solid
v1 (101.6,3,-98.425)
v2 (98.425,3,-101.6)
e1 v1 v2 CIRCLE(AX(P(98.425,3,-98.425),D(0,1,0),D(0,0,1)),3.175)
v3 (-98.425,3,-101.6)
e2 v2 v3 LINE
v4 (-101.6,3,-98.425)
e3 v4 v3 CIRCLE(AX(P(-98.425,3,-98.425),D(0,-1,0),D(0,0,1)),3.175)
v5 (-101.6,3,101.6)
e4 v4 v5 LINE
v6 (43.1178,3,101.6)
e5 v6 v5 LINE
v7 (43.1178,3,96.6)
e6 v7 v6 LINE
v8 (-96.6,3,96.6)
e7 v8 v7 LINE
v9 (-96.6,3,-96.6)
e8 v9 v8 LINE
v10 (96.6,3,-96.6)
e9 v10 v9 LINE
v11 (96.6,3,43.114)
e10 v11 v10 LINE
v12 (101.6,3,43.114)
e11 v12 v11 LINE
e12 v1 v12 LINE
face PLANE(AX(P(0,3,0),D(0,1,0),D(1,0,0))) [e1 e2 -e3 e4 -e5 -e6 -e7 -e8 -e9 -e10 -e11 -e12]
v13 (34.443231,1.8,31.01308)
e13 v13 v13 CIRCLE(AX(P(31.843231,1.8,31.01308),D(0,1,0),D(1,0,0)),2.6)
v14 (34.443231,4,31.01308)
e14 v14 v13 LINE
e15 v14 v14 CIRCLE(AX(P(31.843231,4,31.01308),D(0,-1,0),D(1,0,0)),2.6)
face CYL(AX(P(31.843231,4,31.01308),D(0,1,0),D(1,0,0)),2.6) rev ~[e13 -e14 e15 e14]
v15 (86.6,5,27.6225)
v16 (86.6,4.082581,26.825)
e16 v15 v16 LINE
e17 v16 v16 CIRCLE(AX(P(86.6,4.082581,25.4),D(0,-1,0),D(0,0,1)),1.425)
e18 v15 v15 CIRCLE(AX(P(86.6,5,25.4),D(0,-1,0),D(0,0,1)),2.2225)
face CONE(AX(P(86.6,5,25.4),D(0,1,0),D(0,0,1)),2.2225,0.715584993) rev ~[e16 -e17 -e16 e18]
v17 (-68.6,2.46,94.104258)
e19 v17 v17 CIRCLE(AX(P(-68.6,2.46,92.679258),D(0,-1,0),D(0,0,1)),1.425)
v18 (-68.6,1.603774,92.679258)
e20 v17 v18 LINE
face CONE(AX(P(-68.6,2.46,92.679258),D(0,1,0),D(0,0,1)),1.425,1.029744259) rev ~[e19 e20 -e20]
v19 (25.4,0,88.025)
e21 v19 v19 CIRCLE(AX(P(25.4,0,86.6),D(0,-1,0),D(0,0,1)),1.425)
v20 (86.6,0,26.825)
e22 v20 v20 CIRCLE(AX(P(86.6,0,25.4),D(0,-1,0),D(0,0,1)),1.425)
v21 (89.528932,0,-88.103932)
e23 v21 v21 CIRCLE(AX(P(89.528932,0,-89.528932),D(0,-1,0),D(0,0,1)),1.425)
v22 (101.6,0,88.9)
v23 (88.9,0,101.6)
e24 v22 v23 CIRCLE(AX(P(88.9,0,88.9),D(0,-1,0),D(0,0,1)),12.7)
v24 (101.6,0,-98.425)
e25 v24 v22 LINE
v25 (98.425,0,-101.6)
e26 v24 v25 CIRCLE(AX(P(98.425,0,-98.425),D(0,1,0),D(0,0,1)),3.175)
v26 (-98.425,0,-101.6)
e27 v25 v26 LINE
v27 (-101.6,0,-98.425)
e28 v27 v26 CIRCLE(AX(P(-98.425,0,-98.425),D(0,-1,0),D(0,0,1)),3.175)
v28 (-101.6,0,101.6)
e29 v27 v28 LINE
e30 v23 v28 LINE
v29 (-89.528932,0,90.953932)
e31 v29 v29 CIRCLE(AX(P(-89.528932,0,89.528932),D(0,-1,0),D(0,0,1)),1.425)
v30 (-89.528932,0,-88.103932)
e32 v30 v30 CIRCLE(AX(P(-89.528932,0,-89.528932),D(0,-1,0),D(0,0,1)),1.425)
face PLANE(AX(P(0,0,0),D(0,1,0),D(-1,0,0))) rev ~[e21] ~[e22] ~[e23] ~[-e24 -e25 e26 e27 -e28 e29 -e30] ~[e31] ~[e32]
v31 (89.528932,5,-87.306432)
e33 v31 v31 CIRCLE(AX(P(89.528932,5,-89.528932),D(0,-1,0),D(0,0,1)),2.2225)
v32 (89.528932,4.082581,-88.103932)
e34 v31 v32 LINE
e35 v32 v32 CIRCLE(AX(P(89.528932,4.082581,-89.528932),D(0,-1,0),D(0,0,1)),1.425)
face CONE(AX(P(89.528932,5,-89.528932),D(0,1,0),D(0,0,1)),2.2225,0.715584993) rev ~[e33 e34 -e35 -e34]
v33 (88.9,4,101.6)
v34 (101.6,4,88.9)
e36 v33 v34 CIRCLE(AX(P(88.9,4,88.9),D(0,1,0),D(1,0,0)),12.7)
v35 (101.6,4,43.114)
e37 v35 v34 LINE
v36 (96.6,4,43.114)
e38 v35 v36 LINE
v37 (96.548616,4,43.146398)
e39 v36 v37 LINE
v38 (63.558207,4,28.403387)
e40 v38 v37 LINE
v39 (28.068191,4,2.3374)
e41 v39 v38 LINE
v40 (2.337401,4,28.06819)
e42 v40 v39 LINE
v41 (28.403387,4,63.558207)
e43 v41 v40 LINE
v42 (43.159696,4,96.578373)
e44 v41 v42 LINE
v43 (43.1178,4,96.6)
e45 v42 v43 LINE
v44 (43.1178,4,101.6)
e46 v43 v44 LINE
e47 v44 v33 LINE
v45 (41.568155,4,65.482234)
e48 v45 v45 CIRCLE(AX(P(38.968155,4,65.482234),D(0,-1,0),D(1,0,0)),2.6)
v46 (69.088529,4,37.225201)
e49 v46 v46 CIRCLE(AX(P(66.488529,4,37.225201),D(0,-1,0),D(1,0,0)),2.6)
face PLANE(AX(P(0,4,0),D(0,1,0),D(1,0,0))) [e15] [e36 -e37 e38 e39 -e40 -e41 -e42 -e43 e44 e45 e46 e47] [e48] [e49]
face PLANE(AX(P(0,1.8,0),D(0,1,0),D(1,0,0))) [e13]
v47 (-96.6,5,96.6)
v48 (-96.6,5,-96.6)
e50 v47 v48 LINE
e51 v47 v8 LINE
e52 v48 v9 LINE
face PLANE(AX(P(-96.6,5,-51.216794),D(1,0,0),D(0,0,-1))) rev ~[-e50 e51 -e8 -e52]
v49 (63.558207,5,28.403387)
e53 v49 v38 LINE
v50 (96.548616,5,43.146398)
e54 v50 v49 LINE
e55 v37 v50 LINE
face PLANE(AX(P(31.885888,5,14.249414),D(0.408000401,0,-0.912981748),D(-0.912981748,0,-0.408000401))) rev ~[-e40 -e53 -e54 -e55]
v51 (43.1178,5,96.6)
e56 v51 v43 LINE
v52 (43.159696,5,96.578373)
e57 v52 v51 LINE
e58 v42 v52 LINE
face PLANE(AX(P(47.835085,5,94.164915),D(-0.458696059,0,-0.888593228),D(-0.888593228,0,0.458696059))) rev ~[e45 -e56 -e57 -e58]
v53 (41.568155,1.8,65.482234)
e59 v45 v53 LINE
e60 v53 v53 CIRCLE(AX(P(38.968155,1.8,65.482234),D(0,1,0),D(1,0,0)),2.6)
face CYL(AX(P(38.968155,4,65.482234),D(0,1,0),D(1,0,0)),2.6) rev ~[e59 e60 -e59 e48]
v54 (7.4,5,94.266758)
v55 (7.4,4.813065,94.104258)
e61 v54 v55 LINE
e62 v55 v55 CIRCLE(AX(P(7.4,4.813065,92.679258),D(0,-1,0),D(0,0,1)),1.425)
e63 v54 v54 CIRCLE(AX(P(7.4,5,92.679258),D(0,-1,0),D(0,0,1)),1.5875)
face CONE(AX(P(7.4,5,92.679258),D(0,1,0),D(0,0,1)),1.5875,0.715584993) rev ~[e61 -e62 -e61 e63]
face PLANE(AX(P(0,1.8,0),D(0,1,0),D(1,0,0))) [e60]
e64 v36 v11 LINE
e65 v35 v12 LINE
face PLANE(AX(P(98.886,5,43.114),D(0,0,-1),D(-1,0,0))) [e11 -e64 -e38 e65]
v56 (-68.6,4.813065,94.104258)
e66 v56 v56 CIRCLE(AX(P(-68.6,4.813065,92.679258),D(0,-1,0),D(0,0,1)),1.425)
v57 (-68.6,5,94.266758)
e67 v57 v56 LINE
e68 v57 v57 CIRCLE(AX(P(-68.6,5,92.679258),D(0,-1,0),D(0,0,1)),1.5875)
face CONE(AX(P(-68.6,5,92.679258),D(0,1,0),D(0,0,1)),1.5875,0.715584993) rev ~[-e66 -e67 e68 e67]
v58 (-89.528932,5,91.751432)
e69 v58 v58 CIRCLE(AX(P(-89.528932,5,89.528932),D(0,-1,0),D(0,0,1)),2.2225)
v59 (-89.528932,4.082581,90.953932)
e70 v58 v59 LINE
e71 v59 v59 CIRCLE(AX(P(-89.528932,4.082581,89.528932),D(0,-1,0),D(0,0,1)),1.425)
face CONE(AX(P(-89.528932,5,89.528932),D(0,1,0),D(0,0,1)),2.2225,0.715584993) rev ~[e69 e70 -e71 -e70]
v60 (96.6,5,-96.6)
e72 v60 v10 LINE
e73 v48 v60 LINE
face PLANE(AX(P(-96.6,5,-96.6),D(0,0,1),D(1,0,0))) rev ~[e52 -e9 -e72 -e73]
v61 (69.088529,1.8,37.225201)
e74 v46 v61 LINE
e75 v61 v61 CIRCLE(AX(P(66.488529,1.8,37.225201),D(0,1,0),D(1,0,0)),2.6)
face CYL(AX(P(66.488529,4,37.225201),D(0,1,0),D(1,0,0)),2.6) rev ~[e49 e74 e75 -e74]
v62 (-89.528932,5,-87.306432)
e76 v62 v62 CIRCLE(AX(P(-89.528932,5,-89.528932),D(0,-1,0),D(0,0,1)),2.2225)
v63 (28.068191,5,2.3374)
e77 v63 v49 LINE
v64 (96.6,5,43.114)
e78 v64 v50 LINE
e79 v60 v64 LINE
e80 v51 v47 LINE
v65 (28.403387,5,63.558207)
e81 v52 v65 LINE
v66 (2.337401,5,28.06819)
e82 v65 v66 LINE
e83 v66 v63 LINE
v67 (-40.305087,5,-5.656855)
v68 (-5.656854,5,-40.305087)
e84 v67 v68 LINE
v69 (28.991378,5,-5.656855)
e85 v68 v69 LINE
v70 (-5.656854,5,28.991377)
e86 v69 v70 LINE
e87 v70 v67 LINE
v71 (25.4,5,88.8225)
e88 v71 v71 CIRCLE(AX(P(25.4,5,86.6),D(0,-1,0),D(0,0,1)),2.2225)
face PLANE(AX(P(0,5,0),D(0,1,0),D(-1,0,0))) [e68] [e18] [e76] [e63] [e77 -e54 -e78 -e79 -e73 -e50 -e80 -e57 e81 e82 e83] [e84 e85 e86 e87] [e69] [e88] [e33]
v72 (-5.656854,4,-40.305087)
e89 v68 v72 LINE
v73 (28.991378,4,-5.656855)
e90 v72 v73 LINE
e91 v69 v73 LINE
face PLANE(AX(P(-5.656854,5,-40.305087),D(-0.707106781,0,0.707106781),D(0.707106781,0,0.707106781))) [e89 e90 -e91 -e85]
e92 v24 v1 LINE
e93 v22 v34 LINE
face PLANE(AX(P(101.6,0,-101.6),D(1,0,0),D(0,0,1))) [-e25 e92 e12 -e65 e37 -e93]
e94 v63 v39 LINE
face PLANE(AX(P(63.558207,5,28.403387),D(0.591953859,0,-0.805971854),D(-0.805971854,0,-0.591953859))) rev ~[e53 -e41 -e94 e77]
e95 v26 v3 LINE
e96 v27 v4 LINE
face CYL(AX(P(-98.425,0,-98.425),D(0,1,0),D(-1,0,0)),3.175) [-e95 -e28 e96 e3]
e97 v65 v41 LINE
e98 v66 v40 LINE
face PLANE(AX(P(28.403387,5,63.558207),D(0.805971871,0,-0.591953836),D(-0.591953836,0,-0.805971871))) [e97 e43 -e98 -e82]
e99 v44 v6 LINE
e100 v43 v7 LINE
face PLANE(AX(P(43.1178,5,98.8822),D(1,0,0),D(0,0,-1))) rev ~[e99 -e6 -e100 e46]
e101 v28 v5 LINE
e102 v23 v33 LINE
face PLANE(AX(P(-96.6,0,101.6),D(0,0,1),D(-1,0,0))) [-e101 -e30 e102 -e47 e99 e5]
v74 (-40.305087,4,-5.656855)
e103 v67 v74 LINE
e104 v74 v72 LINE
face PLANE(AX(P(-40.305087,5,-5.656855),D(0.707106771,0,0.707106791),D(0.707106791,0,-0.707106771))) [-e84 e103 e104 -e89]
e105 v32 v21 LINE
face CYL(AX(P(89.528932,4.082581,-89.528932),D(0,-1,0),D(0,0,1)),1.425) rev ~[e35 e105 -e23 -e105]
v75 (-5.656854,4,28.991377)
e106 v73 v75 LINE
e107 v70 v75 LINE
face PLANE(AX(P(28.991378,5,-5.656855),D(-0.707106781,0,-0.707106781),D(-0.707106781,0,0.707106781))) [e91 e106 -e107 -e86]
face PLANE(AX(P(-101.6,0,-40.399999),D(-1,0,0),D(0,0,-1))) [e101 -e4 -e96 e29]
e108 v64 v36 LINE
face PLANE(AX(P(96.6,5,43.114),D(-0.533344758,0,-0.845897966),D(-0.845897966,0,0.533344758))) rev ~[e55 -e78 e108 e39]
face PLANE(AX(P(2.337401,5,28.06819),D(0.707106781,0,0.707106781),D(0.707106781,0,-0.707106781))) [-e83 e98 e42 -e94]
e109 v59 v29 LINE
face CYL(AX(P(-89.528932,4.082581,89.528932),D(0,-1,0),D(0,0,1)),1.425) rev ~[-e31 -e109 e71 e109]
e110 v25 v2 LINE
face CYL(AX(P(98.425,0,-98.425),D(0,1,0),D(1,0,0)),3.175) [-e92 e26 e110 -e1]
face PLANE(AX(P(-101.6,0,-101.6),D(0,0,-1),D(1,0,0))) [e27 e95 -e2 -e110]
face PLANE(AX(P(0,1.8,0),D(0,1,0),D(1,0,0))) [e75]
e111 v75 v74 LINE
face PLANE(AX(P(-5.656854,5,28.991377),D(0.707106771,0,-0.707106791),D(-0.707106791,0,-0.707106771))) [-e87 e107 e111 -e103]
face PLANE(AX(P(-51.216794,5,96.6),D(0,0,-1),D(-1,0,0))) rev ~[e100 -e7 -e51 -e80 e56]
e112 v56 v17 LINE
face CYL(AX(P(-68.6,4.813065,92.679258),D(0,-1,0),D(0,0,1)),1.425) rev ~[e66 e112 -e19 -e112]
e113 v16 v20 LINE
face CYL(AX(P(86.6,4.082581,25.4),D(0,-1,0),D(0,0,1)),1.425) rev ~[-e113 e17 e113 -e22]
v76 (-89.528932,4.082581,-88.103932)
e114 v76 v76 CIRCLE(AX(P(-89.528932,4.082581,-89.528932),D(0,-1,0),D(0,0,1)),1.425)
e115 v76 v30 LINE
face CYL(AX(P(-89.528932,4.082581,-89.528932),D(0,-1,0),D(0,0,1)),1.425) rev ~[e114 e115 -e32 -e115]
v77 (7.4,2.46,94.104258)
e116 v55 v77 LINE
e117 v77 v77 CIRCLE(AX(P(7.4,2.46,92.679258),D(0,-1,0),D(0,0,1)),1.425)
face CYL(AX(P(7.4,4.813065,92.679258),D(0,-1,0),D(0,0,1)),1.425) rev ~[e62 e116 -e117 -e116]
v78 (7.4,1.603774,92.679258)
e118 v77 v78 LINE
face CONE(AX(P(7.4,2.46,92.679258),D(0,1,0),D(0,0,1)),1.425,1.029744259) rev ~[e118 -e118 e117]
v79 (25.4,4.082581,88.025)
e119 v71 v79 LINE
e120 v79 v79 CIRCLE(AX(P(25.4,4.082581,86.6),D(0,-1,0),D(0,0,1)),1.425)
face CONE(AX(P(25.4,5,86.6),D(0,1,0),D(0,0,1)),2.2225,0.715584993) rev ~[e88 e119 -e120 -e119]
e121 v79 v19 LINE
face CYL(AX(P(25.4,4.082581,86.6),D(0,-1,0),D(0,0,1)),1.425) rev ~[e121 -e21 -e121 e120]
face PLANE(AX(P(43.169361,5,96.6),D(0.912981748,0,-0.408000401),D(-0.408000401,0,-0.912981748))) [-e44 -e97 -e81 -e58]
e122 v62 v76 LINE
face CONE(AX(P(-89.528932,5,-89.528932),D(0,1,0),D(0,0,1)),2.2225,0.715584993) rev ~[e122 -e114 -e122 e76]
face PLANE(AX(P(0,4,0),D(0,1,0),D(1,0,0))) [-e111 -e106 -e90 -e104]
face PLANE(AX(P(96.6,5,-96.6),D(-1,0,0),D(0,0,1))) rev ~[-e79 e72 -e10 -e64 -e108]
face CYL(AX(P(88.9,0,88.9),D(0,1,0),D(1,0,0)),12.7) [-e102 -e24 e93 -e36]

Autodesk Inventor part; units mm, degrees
ref_plane "YZ Plane" through (0, 0, 0) normal (1, 0, 0) x (0, 1, 0)
ref_plane "XZ Plane" through (0, 0, 0) normal (0, 1, 0) x (-1, 0, 0)
sketch "Sketch1" plane through (0, 0, 0) normal (0, 1, 0) x (-1, 0, 0)
  line L0 (101.6, -101.6) -> (-101.6, -101.6)
  line L1 (-101.6, -101.6) -> (-101.6, 101.6)
  line L2 (-101.6, 101.6) -> (101.6, 101.6)
  line L3 (101.6, 101.6) -> (101.6, -101.6)
  line L4 (96.6, -96.6) -> (-96.6, -96.6)
  line L5 (-96.6, -96.6) -> (-96.6, 96.6)
  line L6 (-96.6, 96.6) -> (96.6, 96.6)
  line L7 (96.6, 96.6) -> (96.6, -96.6)
  line L8 (101.6, 101.6) -> (-40.4, 101.6)
  circle A0 centre (0, 0) radius 88.9
  circle A1 centre (0, 0) radius 109.337642
  line L9 (-40.4, 101.6) -> (-101.6, 40.4)
  line L10 (-45.4, 101.6) -> (-101.6, 45.4)
  line L11 (96.6, 96.6) -> (96.6, 101.6)
  line L12 (-45.4, 101.6) -> (-35.4, 101.6)
  line L13 (-35.4, 101.6) -> (-35.4, 96.6)
  line L14 (-35.4, 96.6) -> (-45.4, 96.6)
  line L15 (-45.4, 96.6) -> (-45.4, 101.6)
  line L16 (-45.4, 101.6) -> (-43.114, 101.6)
  line L17 (-43.114, 101.6) -> (-43.114, 96.6)
  line L18 (-43.114, 96.6) -> (-45.4, 96.6)
  line L19 (-45.4, 96.6) -> (-45.4, 101.6)
  line L20 (-96.6, 45.4) -> (-101.6, 45.4)
  line L21 (-101.6, 45.4) -> (-101.6, 43.114)
  line L22 (-101.6, 43.114) -> (-96.6, 43.114)
  line L23 (-96.6, 43.114) -> (-96.6, 45.4)
  point P0 (96.6, 51.216794)
  point P1 (101.6, 40.4)
  point P2 (101.6, -40.4)
  point P3 (96.6, -51.216794)
  point P4 (-96.6, 45.4)
  point P5 (-45.4, 96.6)
  dimension "d0" = 203.2
  dimension "d1" = 203.2
  dimension "d2" = 101.6
  dimension "d3" = 101.6
  dimension "d4" = 5
  dimension "d5" = 5
  dimension "d6" = 5
  dimension "d7" = 5
  dimension "d10" = 142
  dimension "d12" = 61.2
  dimension "d14" = 177.8
  dimension "d15" = 5
  dimension "d16" = 5
  dimension "d17" = 10
  dimension "d86" = 2.286
  dimension "d87" = 2.286
extrude "Extrusion1" add sketch "Sketch1" along normal blind 5 contours L0 A1 L4 L7 L3 | L0 A1 L4 | A1 L7 L3 | L0 L1 A1 L5 L4 | A1 L7 L4 | L4 A1 L5 L9 L6 L7 | A1 L7 L11 L2 L3 | L4 L5 A1 | A1 L6 L7 | L1 L9 L22 L5 A1 | L11 L6 A1 L2 | L6 L13 L2 A1 | L1 L22 A1 | A1 L22 L9 | L22 L9 L5 | L6 L17 L9 L2 L13 | L1 L20 A1 L22 | A1 L20 L9 L22 | L20 A1 L10 L5 | L5 L10 L6 L9 | A1 L17 L2 | L9 L17 A1 | L6 L9 L17 | L1 L2 L10 A1 L6 L5 | L10 A1 L20 | L10 A1 L5 | L5 A1 L6 L10 | L15 A1 L17 L9 | L6 L10 A1 L15 | L17 A1 L15 L2 | L5 L6 A1 | L6 A1 L10 | A1 L10 L15 | A0
sketch "Sketch3" plane through (0, 5, 0) normal (0, 1, 0) x (1, 0, 0)
  circle A0 centre (0, 0) radius 88.9
  line L0 (-101.6, 101.6) -> (-101.6, -101.6)
  line L1 (-101.6, -101.6) -> (101.6, -101.6)
  line L2 (-101.6, 101.6) -> (101.6, 101.6)
  line L3 (101.6, 101.6) -> (101.6, -101.6)
  line L4 (101.6, -101.6) -> (-101.6, -101.6)
  line L5 (-101.6, -101.6) -> (-101.6, 101.6)
  line L6 (-96.6, 96.6) -> (96.6, 96.6)
  line L7 (96.6, 96.6) -> (96.6, -96.6)
  line L8 (96.6, -96.6) -> (-96.6, -96.6)
  line L9 (-96.6, -96.6) -> (-96.6, 96.6)
  line L10 (-101.6, -101.6) -> (40.4, -101.6)
  circle A1 centre (0, 0) radius 109.337642
  line L11 (40.4, -101.6) -> (101.6, -40.4)
  line L12 (101.6, -101.6) -> (101.6, 101.6)
  line L13 (45.4038, -101.6) -> (101.6, -45.4038)
  line L14 (96.6, -45.4) -> (101.6, -45.4038)
  line L15 (45.4, -96.6) -> (45.4038, -101.6)
  line L16 (96.6, -45.4) -> (101.6, -45.4)
  line L17 (101.6, -45.4) -> (101.6, -43.114)
  line L18 (101.6, -43.114) -> (96.6, -43.114)
  line L19 (96.6, -43.114) -> (96.6, -45.4)
  line L20 (45.4038, -101.6) -> (43.1178, -101.6)
  line L21 (43.1178, -101.6) -> (43.1178, -96.6)
  line L22 (43.1178, -96.6) -> (45.4038, -96.6)
  line L23 (45.4038, -96.6) -> (45.4038, -101.6)
  point P0 (45.4038, -101.6)
  point P1 (50.4038, -96.6)
  point P2 (96.6, -50.4038)
  dimension "d28" = 177.8
  dimension "d29" = 5
  dimension "d30" = 5
  dimension "d31" = 5
  dimension "d32" = 5
  dimension "d33" = 142
  dimension "d76" = 5.0038
  dimension "d77" = 5.0038
  dimension "d88" = 2.286
  dimension "d89" = 2.286
extrude "Extrusion3" cut sketch "Sketch3" against normal blind 2 contours L2 A1 L6 L9 L0 | A1 L9 L0 | L2 A1 L6 | A1 L9 L8 L1 L0 | L2 L3 A1 L7 L6 | A1 L8 L21 L11 L1 | L3 L11 L18 L7 A1 | A1 L21 L1 | L11 L21 A1 | L3 L18 A1 | A1 L18 L11
sketch "Sketch4" plane through (0, 5, 0) normal (0, 1, 0) x (1, 0, 0)
  line L0 (101.6, 101.6) -> (-101.6, 101.6)
  line L1 (-101.6, 101.6) -> (-101.6, -101.6)
  line L2 (-101.6, -101.6) -> (101.6, -101.6)
  line L3 (101.6, -101.6) -> (101.6, 101.6)
  circle A0 centre (0, 0) radius 2.5
  line L4 (11.331386, 2.138998) -> (-2.138998, -11.331386)
  line L5 (0, 0) -> (-5.656854, 5.656854)
  line L6 (-5.656854, -14.849242) -> (-26.162951, 5.656855)
  line L7 (-5.656854, 26.162952) -> (14.849242, 5.656855)
  circle A1 centre (-5.656854, 5.656854) radius 14
  line L8 (-26.162951, 5.656855) -> (-5.656854, 26.162952)
  line L9 (14.849242, 5.656855) -> (-5.656854, -14.849242)
  line L10 (-40.305087, 5.656855) -> (-5.656854, 40.305087)
  line L11 (-5.656854, 40.305087) -> (28.991378, 5.656855)
  line L12 (28.991378, 5.656855) -> (-5.656854, -28.991377)
  line L13 (-5.656854, -28.991377) -> (-40.305087, 5.656855)
  line L14 (-22.645095, 9.174711) -> (-9.174711, 22.645095)
  line L15 (-9.174711, 22.645095) -> (-12.766813, 26.237197)
  line L16 (-12.766813, 26.237197) -> (-26.237197, 12.766813)
  line L17 (-26.237197, 12.766813) -> (-22.645095, 9.174711)
  point P0 (9.525, 22.5)
  point P1 (-9.525, -6.5)
  dimension "d37" = 203.2
  dimension "d38" = 203.2
  dimension "d39" = 8
  dimension "d40" = 28
  dimension "d41" = 29
  dimension "d42" = 29
  dimension "d43" = 14.5
  dimension "d44" = 10
  dimension "d45" = 10
  dimension "d46" = 10
  dimension "d47" = 10
  dimension "d48" = 5.08
  dimension "d49" = 9.525
  dimension "d50" = 9.525
  dimension "d55" = 101.6
  dimension "d56" = 101.6
extrude "Extrusion4" cut sketch "Sketch4" against normal blind 1 contours A0 | L4 L9 L6 L8 L7 | L8 L17 L16 L15 | A1 | L10 L11 L12 L13
sketch "Sketch6" plane through (0, 5, 0) normal (0, 1, 0) x (1, 0, 0)
  line L0 (45.4038, -101.6) -> (0, 0)
  line L1 (50.4038, -96.6) -> (45.4038, -101.6)
  line L2 (96.6, -43.114) -> (96.6, 96.6)
  line L3 (101.6, -101.6) -> (101.6, 101.6)
  circle A0 centre (0, 0) radius 34.925
  circle A1 centre (0, 0) radius 33.425
  line L4 (-101.6, 101.6) -> (-101.6, -101.6)
  line L5 (-101.6, -101.6) -> (40.4, -101.6)
  line L6 (-101.6, -101.6) -> (101.6, -101.6)
  line L7 (101.6, 101.6) -> (101.6, -43.114)
  line L8 (101.6, -45.4038) -> (0, 0)
  line L9 (-96.6, -96.6) -> (43.1178, -96.6)
  line L10 (96.6, -43.114) -> (96.6, 96.6)
  line L11 (43.1178, -101.6) -> (-101.6, -101.6)
  line L12 (101.6, -45.4038) -> (96.6, -50.4038)
  line L13 (45.4038, -101.6) -> (101.6, -45.4038)
  line L14 (43.1178, -101.6) -> (101.6, -101.6)
  line L15 (0, 0) -> (101.6, -50.4076)
  line L16 (50.4076, -101.6) -> (0, 0)
  line L17 (43.169361, -96.6) -> (47.926911, -96.6)
  line L18 (96.6, -43.169361) -> (96.6, -47.926911)
  line L19 (40.4, -101.6) -> (101.6, -40.4)
  point P0 (13.637413, -30.516415)
  point P1 (30.516415, -13.637413)
  point P2 (14.249414, -31.885888)
  point P3 (31.286053, -15.522194)
  point P4 (29.942343, -14.855528)
  point P5 (31.885888, -14.249414)
  point P6 (98.255522, -48.748278)
  point P7 (96.6, -47.926911)
  point P8 (47.926911, -96.6)
  point P9 (15.522194, -31.286053)
  point P10 (96.6, -45.4)
  point P11 (45.4, -96.6)
  point P12 (14.855528, -29.942343)
  point P13 (96.6, -45.4)
  point P14 (45.4, -96.6)
  point P15 (45.4, -96.6)
  point P16 (47.088956, -94.911044)
  point P17 (94.911044, -47.088956)
  point P18 (96.6, -45.4)
  point P19 (43.858319, -98.141681)
  point P20 (98.141681, -43.858319)
  point P21 (45.4, -96.6)
  point P22 (96.6, -45.4)
  dimension "d71" = 69.85
  dimension "d72" = 66.85
  dimension "d75" = 142
  dimension "d78" = 5.0038
  dimension "d82" = 5.0038
extrude "Extrusion6" cut sketch "Sketch6" against normal blind 1 contours L0 A0 L16 L19 L17 | L0 A1 L16 A0 | L16 A1 L15 A0 | L15 A0 L8 L18 L19 | A0 L15 A1 L8
fillet "Fillet3" radius 12.7 1 edges at (101.6, 2.5, 101.6)
sketch "Sketch9" plane through (0, 4, 0) normal (0, 1, 0) x (1, 0, 0)
  point P0 (0, 0)
sketch "Sketch10" plane through (0, 5, 0) normal (0, 1, 0) x (1, 0, 0)
  point P0 (0, 0)
ref_plane "Work Plane1" through (24.695704, 5, 24.695704) normal (0.7071068, 0, 0.7071068) x (0.7071068, 0, -0.7071068)
sketch "Sketch15" plane through (0, 5, 0) normal (0, 1, 0) x (1, 0, 0)
  line L0 (43.169361, -96.6) -> (13.637413, -30.516415)
  line L1 (28.403387, -63.558207) -> (-0.656854, -23.991377)
  line L2 (28.991378, 5.656855) -> (-5.656854, -28.991377)
  line L3 (30.516415, -13.637413) -> (96.6, -43.169361)
  line L4 (-5.656854, 40.305087) -> (28.991378, 5.656855)
  line L5 (63.558207, -28.403387) -> (23.991378, 0.656855)
  line L6 (2.337401, -28.06819) -> (28.068191, -2.3374)
  arc A0 (13.637413, -30.516415) -> (30.516415, -13.637413) centre (0, 0) ccw
  line L7 (28.403387, -63.558207) -> (13.637413, -30.516415)
  line L8 (63.558207, -28.403387) -> (30.516415, -13.637413)
  arc A1 (13.637413, -30.516415) -> (30.516415, -13.637413) centre (0, 0) ccw
  line L9 (28.619467, -64.395349) -> (1.630294, -28.775297)
  line L10 (1.630294, -28.775297) -> (2.337401, -28.06819)
  dimension "d138" = 5
  dimension "d139" = 5
  dimension "d140" = 5
  dimension "d168" = 1
extrude "Extrusion11" cut sketch "Sketch15" against normal blind 1 contours L1 L6 L5 L3 A0 L0
sketch "Sketch16" plane through (0, 4, 0) normal (0, 1, 0) x (1, 0, 0)
  line L0 (2.337401, -28.06819) -> (28.068191, -2.3374)
  line L1 (9.408468, -20.997123) -> (12.944002, -24.532656)
  line L2 (12.944002, -24.532656) -> (24.532657, -12.944002)
  line L3 (24.532657, -12.944002) -> (20.997123, -9.408468)
  line L4 (12.944002, -24.532656) -> (24.532657, -12.944002)
  line L5 (24.532657, -12.944002) -> (28.559218, -16.970562)
  line L6 (28.559218, -16.970562) -> (16.970563, -28.559217)
  line L7 (16.970563, -28.559217) -> (12.944002, -24.532656)
  line L8 (12.944002, -24.532656) -> (5.331655, -32.145003)
  line L9 (28.403387, -63.558207) -> (2.337401, -28.06819)
  line L10 (24.532657, -12.944002) -> (32.145004, -5.331655)
  line L11 (28.068191, -2.3374) -> (63.558207, -28.403387)
  point P0 (0, 0)
  dimension "d144" = 10
  dimension "d145" = 10
  dimension "d146" = 5
  dimension "d152" = 0
  dimension "d153" = 0
extrude "Extrusion12" cut sketch "Sketch16" along normal up to surface (1 mm away)
sketch "Sketch20" plane through (0, 5, 0) normal (0, 1, 0) x (1, 0, 0)
  line L0 (47.088956, -94.911044) -> (45.4, -96.6)
  line L1 (47.088956, -94.911044) -> (94.937604, -47.062396)
  line L2 (94.164915, -47.835085) -> (33.507042, -17.740422)
  line L3 (94.911044, -47.088956) -> (31.286053, -15.522194)
  line L4 (15.522194, -31.286053) -> (47.088956, -94.911044)
  line L5 (17.526471, -33.075809) -> (47.835085, -94.164915)
  arc A0 (15.522194, -31.286053) -> (31.286053, -15.522194) centre (0, 0) ccw
  line L6 (33.507042, -17.740422) -> (31.719266, -16.853439)
  line L7 (17.526471, -33.075809) -> (16.753056, -31.516938)
  arc A1 (16.753056, -31.516938) -> (31.719266, -16.853439) centre (3.790359, -3.317307) ccw
  dimension "d169" = 1
  dimension "d172" = 1
extrude "Extrusion13" cut sketch "Sketch20" against normal blind 1 contours L4 A0 L3 L1 L2 L6 A1 L7 L5
sketch "Sketch21" plane through (0, 5, 0) normal (0, 1, 0) x (1, 0, 0)
  line L0 (31.719266, -10.124493) -> (13.677789, -27.994866)
  line L1 (47.835085, -94.164915) -> (45.4, -96.6)
  line L2 (13.677789, -27.994866) -> (47.835085, -94.164915)
  line L3 (47.835085, -94.164915) -> (43.1178, -96.6)
  line L4 (43.1178, -96.6) -> (43.1178, -101.6)
  line L5 (43.1178, -96.6) -> (43.1178, -101.6)
  line L6 (43.1178, -101.6) -> (100.933808, -101.6)
  line L7 (100.933808, -101.6) -> (101.6, -101.6)
  line L8 (101.6, 101.6) -> (101.6, -43.114)
  line L9 (101.6, -43.114) -> (101.6, -101.6)
  line L10 (101.6, -88.9) -> (101.6, 101.6)
  line L11 (101.6, -43.114) -> (96.6, -43.114)
  line L12 (96.6, -43.114) -> (91.337275, -46.432186)
  line L13 (94.164915, -47.835085) -> (31.719266, -16.853439)
  line L14 (91.337275, -46.432186) -> (27.19303, -14.607802)
extrude "Extrusion14" cut sketch "Sketch21" against normal blind 1
sketch "Sketch22" plane through (0, 5, 0) normal (0, 1, 0) x (1, 0, 0)
  point P0 (0, 0)
sketch "Sketch25" plane through (0, 5, 0) normal (0, 1, 0) x (1, 0, 0)
  line L0 (-96.6, 96.6) -> (-96.6, -96.6)
  line L1 (96.6, 96.6) -> (-96.6, 96.6)
  line L2 (-96.6, 96.6) -> (96.6, 96.6)
  line L3 (96.6, -45.4) -> (45.4, -96.6)
  line L4 (96.6, 96.6) -> (96.6, -45.4)
  line L5 (96.6, -45.4) -> (45.4, -96.6)
  line L6 (45.4, -96.6) -> (-96.6, -96.6)
  line L7 (-96.6, -96.6) -> (-96.6, 96.6)
  line L8 (-96.6, 96.6) -> (-89.528932, 89.528932)
  circle A0 centre (-89.528932, 89.528932) radius 5
  circle A1 centre (-89.528932, 89.528932) radius 1.5
  line L9 (-89.528932, 84.528932) -> (-96.6, 84.528932)
  line L10 (-89.528932, 89.528932) -> (-89.528932, 84.528932)
  line L11 (-89.528932, 89.528932) -> (-84.528932, 89.528932)
  line L12 (-84.528932, 96.6) -> (-84.528932, 89.528932)
  line L13 (-96.6, -96.6) -> (-89.528932, -89.528932)
  line L14 (-96.6, -96.6) -> (-86.6, -96.6) construction
  circle A2 centre (-89.528932, -89.528932) radius 5
  circle A3 centre (-89.528932, -89.528932) radius 1.75
  line L15 (-89.528932, -89.528932) -> (-84.528932, -89.528932)
  line L16 (-84.528932, -96.6) -> (-84.528932, -89.528932)
  line L17 (-89.528932, -89.528932) -> (-89.528932, -84.528932)
  line L18 (-96.6, -84.528932) -> (-89.528932, -84.528932)
  line L19 (96.6, 96.6) -> (89.528932, 89.528932)
  circle A4 centre (89.528932, 89.528932) radius 5
  circle A5 centre (89.528932, 89.528932) radius 1.75
  line L20 (89.528932, 89.528932) -> (84.528932, 89.528932)
  line L21 (84.528932, 96.6) -> (84.528932, 89.528932)
  line L22 (89.528932, 89.528932) -> (89.528932, 84.528932)
  line L23 (96.6, 84.528932) -> (89.528932, 84.528932)
  line L24 (96.6, -43.114) -> (96.6, 96.6)
  line L25 (-96.6, -96.6) -> (43.1178, -96.6)
  line L26 (28.991378, 5.656855) -> (-5.656854, -28.991377)
  line L27 (25.4, -25.4) -> (101.6, -25.4)
  line L28 (101.6, -88.9) -> (101.6, 101.6)
  line L29 (25.4, -25.4) -> (25.4, -101.6)
  line L30 (43.1178, -101.6) -> (-101.6, -101.6)
  line L31 (96.6, -25.4) -> (86.6, -25.4)
  circle A6 centre (86.6, -25.4) radius 5
  circle A7 centre (86.6, -25.4) radius 1.75
  line L32 (25.4, -96.6) -> (25.4, -86.6)
  circle A8 centre (25.4, -86.6) radius 5
  circle A9 centre (25.4, -86.6) radius 1.75
  point P0 (0, 0)
  dimension "d203" = 10
  dimension "d205" = 3
  dimension "d206" = 10
  dimension "d207" = 45
  dimension "d208" = 10
  dimension "d209" = 3.5
  dimension "d210" = 10
  dimension "d211" = 10
  dimension "d212" = 3.5
  dimension "d223" = 76.2
  dimension "d224" = 76.2
  dimension "d225" = 10
  dimension "d226" = 10
  dimension "d227" = 3.5
  dimension "d228" = 10
  dimension "d229" = 10
  dimension "d230" = 3.5
hole "Hole3" at (-89.528932, 5, 89.528932) at (-89.528932, 5, -89.528932) at (89.528932, 5, -89.528932) at (25.4, 5, 86.6) at (86.6, 5, 25.4) direction (0, -1, 0) diameter 2.85 depth 12.7 tip angle 118 countersink diameter 4.445 countersink angle 82 thread size "M3.5x0.6" class "6H" standard "ANSI Metric M Profile"
sketch "Sketch26" plane through (0, 5, 0) normal (0, 1, 0) x (1, 0, 0)
  line L0 (-96.6, -92.679258) -> (-96.6, -59.679258)
  line L1 (-68.6, -92.679258) -> (-96.6, -92.679258)
  line L2 (-96.6, -96.6) -> (43.1178, -96.6)
  line L3 (-68.6, -92.679258) -> (-68.6, -96.6)
  line L4 (-68.6, -92.679258) -> (7.4, -92.679258)
  circle A0 centre (-68.6, -92.679258) radius 1.5
  circle A1 centre (7.4, -92.679258) radius 1.5
  line L5 (-101.6, -101.6) -> (-101.6, 101.6)
  point P0 (0, 0)
  dimension "d232" = 3.92074
  dimension "d234" = 76
  dimension "d235" = 3
  dimension "d236" = 3
  dimension "d244" = 33
hole "Hole4" at (-68.6, 5, 92.679258) at (7.4, 5, 92.679258) direction (0, -1, 0) diameter 2.85 depth 2.54 tip angle 118 countersink diameter 3.175 countersink angle 82 thread size "M3.5x0.6" class "6H" standard "ANSI Metric M Profile"
sketch "Sketch28" plane through (0, 0, 0) normal (0, -1, 0) x (1, 0, 0)
  circle A0 centre (-6.381482, -33.94934) radius 1.425
  circle A1 centre (-6.381482, -33.94934) radius 1.425
  circle A2 centre (-33.953993, -6.376829) radius 1.425
  circle A3 centre (-33.953993, -6.376829) radius 1.425
  circle A4 centre (-5.28314, 22.294025) radius 1.425
  circle A5 centre (-5.28314, 22.294025) radius 1.425
  circle A6 centre (22.289371, -5.278486) radius 1.5113
  circle A7 centre (22.289371, -5.278486) radius 1.5113
  point P0 (0, 0)
  point P1 (0, 0)
fillet "Fillet5" radius 3.175 2 edges at (101.6, 1.5, -101.6) (-101.6, 1.5, -101.6)
sketch "Sketch29" plane through (0, 4, 0) normal (0, 1, 0) x (1, 0, 0)
  line L0 (96.6, -43.114) -> (96.6, 96.6)
  line L1 (0, 0) -> (18.582937, 0.245427)
  line L2 (0, 0) -> (0.183127, -13.865783)
  line L3 (0, 0) -> (31.843231, -31.01308)
  circle A0 centre (31.843231, -31.01308) radius 2.6
  line L4 (0, 0) -> (38.968155, -65.482234)
  line L5 (0, 0) -> (66.488529, -37.225201)
  circle A1 centre (66.488529, -37.225201) radius 2.6
  circle A2 centre (38.968155, -65.482234) radius 2.6
  dimension "d266" = 5.2
  dimension "d267" = 44.45
  dimension "d268" = 76.2
  dimension "d269" = 76.2
  dimension "d270" = 15
  dimension "d271" = 15
  dimension "d272" = 5.2
  dimension "d273" = 5.2
  dimension "d274" = 30
  dimension "d275" = 30
extrude "Extrusion16" cut sketch "Sketch29" against normal blind 2.2
equation "\"d1\" = d0"
equation "\"d2\" = 0.5 * d0"
equation "\"d3\" = 0.5 * d0"
properties part number "Box_Walls_2"
